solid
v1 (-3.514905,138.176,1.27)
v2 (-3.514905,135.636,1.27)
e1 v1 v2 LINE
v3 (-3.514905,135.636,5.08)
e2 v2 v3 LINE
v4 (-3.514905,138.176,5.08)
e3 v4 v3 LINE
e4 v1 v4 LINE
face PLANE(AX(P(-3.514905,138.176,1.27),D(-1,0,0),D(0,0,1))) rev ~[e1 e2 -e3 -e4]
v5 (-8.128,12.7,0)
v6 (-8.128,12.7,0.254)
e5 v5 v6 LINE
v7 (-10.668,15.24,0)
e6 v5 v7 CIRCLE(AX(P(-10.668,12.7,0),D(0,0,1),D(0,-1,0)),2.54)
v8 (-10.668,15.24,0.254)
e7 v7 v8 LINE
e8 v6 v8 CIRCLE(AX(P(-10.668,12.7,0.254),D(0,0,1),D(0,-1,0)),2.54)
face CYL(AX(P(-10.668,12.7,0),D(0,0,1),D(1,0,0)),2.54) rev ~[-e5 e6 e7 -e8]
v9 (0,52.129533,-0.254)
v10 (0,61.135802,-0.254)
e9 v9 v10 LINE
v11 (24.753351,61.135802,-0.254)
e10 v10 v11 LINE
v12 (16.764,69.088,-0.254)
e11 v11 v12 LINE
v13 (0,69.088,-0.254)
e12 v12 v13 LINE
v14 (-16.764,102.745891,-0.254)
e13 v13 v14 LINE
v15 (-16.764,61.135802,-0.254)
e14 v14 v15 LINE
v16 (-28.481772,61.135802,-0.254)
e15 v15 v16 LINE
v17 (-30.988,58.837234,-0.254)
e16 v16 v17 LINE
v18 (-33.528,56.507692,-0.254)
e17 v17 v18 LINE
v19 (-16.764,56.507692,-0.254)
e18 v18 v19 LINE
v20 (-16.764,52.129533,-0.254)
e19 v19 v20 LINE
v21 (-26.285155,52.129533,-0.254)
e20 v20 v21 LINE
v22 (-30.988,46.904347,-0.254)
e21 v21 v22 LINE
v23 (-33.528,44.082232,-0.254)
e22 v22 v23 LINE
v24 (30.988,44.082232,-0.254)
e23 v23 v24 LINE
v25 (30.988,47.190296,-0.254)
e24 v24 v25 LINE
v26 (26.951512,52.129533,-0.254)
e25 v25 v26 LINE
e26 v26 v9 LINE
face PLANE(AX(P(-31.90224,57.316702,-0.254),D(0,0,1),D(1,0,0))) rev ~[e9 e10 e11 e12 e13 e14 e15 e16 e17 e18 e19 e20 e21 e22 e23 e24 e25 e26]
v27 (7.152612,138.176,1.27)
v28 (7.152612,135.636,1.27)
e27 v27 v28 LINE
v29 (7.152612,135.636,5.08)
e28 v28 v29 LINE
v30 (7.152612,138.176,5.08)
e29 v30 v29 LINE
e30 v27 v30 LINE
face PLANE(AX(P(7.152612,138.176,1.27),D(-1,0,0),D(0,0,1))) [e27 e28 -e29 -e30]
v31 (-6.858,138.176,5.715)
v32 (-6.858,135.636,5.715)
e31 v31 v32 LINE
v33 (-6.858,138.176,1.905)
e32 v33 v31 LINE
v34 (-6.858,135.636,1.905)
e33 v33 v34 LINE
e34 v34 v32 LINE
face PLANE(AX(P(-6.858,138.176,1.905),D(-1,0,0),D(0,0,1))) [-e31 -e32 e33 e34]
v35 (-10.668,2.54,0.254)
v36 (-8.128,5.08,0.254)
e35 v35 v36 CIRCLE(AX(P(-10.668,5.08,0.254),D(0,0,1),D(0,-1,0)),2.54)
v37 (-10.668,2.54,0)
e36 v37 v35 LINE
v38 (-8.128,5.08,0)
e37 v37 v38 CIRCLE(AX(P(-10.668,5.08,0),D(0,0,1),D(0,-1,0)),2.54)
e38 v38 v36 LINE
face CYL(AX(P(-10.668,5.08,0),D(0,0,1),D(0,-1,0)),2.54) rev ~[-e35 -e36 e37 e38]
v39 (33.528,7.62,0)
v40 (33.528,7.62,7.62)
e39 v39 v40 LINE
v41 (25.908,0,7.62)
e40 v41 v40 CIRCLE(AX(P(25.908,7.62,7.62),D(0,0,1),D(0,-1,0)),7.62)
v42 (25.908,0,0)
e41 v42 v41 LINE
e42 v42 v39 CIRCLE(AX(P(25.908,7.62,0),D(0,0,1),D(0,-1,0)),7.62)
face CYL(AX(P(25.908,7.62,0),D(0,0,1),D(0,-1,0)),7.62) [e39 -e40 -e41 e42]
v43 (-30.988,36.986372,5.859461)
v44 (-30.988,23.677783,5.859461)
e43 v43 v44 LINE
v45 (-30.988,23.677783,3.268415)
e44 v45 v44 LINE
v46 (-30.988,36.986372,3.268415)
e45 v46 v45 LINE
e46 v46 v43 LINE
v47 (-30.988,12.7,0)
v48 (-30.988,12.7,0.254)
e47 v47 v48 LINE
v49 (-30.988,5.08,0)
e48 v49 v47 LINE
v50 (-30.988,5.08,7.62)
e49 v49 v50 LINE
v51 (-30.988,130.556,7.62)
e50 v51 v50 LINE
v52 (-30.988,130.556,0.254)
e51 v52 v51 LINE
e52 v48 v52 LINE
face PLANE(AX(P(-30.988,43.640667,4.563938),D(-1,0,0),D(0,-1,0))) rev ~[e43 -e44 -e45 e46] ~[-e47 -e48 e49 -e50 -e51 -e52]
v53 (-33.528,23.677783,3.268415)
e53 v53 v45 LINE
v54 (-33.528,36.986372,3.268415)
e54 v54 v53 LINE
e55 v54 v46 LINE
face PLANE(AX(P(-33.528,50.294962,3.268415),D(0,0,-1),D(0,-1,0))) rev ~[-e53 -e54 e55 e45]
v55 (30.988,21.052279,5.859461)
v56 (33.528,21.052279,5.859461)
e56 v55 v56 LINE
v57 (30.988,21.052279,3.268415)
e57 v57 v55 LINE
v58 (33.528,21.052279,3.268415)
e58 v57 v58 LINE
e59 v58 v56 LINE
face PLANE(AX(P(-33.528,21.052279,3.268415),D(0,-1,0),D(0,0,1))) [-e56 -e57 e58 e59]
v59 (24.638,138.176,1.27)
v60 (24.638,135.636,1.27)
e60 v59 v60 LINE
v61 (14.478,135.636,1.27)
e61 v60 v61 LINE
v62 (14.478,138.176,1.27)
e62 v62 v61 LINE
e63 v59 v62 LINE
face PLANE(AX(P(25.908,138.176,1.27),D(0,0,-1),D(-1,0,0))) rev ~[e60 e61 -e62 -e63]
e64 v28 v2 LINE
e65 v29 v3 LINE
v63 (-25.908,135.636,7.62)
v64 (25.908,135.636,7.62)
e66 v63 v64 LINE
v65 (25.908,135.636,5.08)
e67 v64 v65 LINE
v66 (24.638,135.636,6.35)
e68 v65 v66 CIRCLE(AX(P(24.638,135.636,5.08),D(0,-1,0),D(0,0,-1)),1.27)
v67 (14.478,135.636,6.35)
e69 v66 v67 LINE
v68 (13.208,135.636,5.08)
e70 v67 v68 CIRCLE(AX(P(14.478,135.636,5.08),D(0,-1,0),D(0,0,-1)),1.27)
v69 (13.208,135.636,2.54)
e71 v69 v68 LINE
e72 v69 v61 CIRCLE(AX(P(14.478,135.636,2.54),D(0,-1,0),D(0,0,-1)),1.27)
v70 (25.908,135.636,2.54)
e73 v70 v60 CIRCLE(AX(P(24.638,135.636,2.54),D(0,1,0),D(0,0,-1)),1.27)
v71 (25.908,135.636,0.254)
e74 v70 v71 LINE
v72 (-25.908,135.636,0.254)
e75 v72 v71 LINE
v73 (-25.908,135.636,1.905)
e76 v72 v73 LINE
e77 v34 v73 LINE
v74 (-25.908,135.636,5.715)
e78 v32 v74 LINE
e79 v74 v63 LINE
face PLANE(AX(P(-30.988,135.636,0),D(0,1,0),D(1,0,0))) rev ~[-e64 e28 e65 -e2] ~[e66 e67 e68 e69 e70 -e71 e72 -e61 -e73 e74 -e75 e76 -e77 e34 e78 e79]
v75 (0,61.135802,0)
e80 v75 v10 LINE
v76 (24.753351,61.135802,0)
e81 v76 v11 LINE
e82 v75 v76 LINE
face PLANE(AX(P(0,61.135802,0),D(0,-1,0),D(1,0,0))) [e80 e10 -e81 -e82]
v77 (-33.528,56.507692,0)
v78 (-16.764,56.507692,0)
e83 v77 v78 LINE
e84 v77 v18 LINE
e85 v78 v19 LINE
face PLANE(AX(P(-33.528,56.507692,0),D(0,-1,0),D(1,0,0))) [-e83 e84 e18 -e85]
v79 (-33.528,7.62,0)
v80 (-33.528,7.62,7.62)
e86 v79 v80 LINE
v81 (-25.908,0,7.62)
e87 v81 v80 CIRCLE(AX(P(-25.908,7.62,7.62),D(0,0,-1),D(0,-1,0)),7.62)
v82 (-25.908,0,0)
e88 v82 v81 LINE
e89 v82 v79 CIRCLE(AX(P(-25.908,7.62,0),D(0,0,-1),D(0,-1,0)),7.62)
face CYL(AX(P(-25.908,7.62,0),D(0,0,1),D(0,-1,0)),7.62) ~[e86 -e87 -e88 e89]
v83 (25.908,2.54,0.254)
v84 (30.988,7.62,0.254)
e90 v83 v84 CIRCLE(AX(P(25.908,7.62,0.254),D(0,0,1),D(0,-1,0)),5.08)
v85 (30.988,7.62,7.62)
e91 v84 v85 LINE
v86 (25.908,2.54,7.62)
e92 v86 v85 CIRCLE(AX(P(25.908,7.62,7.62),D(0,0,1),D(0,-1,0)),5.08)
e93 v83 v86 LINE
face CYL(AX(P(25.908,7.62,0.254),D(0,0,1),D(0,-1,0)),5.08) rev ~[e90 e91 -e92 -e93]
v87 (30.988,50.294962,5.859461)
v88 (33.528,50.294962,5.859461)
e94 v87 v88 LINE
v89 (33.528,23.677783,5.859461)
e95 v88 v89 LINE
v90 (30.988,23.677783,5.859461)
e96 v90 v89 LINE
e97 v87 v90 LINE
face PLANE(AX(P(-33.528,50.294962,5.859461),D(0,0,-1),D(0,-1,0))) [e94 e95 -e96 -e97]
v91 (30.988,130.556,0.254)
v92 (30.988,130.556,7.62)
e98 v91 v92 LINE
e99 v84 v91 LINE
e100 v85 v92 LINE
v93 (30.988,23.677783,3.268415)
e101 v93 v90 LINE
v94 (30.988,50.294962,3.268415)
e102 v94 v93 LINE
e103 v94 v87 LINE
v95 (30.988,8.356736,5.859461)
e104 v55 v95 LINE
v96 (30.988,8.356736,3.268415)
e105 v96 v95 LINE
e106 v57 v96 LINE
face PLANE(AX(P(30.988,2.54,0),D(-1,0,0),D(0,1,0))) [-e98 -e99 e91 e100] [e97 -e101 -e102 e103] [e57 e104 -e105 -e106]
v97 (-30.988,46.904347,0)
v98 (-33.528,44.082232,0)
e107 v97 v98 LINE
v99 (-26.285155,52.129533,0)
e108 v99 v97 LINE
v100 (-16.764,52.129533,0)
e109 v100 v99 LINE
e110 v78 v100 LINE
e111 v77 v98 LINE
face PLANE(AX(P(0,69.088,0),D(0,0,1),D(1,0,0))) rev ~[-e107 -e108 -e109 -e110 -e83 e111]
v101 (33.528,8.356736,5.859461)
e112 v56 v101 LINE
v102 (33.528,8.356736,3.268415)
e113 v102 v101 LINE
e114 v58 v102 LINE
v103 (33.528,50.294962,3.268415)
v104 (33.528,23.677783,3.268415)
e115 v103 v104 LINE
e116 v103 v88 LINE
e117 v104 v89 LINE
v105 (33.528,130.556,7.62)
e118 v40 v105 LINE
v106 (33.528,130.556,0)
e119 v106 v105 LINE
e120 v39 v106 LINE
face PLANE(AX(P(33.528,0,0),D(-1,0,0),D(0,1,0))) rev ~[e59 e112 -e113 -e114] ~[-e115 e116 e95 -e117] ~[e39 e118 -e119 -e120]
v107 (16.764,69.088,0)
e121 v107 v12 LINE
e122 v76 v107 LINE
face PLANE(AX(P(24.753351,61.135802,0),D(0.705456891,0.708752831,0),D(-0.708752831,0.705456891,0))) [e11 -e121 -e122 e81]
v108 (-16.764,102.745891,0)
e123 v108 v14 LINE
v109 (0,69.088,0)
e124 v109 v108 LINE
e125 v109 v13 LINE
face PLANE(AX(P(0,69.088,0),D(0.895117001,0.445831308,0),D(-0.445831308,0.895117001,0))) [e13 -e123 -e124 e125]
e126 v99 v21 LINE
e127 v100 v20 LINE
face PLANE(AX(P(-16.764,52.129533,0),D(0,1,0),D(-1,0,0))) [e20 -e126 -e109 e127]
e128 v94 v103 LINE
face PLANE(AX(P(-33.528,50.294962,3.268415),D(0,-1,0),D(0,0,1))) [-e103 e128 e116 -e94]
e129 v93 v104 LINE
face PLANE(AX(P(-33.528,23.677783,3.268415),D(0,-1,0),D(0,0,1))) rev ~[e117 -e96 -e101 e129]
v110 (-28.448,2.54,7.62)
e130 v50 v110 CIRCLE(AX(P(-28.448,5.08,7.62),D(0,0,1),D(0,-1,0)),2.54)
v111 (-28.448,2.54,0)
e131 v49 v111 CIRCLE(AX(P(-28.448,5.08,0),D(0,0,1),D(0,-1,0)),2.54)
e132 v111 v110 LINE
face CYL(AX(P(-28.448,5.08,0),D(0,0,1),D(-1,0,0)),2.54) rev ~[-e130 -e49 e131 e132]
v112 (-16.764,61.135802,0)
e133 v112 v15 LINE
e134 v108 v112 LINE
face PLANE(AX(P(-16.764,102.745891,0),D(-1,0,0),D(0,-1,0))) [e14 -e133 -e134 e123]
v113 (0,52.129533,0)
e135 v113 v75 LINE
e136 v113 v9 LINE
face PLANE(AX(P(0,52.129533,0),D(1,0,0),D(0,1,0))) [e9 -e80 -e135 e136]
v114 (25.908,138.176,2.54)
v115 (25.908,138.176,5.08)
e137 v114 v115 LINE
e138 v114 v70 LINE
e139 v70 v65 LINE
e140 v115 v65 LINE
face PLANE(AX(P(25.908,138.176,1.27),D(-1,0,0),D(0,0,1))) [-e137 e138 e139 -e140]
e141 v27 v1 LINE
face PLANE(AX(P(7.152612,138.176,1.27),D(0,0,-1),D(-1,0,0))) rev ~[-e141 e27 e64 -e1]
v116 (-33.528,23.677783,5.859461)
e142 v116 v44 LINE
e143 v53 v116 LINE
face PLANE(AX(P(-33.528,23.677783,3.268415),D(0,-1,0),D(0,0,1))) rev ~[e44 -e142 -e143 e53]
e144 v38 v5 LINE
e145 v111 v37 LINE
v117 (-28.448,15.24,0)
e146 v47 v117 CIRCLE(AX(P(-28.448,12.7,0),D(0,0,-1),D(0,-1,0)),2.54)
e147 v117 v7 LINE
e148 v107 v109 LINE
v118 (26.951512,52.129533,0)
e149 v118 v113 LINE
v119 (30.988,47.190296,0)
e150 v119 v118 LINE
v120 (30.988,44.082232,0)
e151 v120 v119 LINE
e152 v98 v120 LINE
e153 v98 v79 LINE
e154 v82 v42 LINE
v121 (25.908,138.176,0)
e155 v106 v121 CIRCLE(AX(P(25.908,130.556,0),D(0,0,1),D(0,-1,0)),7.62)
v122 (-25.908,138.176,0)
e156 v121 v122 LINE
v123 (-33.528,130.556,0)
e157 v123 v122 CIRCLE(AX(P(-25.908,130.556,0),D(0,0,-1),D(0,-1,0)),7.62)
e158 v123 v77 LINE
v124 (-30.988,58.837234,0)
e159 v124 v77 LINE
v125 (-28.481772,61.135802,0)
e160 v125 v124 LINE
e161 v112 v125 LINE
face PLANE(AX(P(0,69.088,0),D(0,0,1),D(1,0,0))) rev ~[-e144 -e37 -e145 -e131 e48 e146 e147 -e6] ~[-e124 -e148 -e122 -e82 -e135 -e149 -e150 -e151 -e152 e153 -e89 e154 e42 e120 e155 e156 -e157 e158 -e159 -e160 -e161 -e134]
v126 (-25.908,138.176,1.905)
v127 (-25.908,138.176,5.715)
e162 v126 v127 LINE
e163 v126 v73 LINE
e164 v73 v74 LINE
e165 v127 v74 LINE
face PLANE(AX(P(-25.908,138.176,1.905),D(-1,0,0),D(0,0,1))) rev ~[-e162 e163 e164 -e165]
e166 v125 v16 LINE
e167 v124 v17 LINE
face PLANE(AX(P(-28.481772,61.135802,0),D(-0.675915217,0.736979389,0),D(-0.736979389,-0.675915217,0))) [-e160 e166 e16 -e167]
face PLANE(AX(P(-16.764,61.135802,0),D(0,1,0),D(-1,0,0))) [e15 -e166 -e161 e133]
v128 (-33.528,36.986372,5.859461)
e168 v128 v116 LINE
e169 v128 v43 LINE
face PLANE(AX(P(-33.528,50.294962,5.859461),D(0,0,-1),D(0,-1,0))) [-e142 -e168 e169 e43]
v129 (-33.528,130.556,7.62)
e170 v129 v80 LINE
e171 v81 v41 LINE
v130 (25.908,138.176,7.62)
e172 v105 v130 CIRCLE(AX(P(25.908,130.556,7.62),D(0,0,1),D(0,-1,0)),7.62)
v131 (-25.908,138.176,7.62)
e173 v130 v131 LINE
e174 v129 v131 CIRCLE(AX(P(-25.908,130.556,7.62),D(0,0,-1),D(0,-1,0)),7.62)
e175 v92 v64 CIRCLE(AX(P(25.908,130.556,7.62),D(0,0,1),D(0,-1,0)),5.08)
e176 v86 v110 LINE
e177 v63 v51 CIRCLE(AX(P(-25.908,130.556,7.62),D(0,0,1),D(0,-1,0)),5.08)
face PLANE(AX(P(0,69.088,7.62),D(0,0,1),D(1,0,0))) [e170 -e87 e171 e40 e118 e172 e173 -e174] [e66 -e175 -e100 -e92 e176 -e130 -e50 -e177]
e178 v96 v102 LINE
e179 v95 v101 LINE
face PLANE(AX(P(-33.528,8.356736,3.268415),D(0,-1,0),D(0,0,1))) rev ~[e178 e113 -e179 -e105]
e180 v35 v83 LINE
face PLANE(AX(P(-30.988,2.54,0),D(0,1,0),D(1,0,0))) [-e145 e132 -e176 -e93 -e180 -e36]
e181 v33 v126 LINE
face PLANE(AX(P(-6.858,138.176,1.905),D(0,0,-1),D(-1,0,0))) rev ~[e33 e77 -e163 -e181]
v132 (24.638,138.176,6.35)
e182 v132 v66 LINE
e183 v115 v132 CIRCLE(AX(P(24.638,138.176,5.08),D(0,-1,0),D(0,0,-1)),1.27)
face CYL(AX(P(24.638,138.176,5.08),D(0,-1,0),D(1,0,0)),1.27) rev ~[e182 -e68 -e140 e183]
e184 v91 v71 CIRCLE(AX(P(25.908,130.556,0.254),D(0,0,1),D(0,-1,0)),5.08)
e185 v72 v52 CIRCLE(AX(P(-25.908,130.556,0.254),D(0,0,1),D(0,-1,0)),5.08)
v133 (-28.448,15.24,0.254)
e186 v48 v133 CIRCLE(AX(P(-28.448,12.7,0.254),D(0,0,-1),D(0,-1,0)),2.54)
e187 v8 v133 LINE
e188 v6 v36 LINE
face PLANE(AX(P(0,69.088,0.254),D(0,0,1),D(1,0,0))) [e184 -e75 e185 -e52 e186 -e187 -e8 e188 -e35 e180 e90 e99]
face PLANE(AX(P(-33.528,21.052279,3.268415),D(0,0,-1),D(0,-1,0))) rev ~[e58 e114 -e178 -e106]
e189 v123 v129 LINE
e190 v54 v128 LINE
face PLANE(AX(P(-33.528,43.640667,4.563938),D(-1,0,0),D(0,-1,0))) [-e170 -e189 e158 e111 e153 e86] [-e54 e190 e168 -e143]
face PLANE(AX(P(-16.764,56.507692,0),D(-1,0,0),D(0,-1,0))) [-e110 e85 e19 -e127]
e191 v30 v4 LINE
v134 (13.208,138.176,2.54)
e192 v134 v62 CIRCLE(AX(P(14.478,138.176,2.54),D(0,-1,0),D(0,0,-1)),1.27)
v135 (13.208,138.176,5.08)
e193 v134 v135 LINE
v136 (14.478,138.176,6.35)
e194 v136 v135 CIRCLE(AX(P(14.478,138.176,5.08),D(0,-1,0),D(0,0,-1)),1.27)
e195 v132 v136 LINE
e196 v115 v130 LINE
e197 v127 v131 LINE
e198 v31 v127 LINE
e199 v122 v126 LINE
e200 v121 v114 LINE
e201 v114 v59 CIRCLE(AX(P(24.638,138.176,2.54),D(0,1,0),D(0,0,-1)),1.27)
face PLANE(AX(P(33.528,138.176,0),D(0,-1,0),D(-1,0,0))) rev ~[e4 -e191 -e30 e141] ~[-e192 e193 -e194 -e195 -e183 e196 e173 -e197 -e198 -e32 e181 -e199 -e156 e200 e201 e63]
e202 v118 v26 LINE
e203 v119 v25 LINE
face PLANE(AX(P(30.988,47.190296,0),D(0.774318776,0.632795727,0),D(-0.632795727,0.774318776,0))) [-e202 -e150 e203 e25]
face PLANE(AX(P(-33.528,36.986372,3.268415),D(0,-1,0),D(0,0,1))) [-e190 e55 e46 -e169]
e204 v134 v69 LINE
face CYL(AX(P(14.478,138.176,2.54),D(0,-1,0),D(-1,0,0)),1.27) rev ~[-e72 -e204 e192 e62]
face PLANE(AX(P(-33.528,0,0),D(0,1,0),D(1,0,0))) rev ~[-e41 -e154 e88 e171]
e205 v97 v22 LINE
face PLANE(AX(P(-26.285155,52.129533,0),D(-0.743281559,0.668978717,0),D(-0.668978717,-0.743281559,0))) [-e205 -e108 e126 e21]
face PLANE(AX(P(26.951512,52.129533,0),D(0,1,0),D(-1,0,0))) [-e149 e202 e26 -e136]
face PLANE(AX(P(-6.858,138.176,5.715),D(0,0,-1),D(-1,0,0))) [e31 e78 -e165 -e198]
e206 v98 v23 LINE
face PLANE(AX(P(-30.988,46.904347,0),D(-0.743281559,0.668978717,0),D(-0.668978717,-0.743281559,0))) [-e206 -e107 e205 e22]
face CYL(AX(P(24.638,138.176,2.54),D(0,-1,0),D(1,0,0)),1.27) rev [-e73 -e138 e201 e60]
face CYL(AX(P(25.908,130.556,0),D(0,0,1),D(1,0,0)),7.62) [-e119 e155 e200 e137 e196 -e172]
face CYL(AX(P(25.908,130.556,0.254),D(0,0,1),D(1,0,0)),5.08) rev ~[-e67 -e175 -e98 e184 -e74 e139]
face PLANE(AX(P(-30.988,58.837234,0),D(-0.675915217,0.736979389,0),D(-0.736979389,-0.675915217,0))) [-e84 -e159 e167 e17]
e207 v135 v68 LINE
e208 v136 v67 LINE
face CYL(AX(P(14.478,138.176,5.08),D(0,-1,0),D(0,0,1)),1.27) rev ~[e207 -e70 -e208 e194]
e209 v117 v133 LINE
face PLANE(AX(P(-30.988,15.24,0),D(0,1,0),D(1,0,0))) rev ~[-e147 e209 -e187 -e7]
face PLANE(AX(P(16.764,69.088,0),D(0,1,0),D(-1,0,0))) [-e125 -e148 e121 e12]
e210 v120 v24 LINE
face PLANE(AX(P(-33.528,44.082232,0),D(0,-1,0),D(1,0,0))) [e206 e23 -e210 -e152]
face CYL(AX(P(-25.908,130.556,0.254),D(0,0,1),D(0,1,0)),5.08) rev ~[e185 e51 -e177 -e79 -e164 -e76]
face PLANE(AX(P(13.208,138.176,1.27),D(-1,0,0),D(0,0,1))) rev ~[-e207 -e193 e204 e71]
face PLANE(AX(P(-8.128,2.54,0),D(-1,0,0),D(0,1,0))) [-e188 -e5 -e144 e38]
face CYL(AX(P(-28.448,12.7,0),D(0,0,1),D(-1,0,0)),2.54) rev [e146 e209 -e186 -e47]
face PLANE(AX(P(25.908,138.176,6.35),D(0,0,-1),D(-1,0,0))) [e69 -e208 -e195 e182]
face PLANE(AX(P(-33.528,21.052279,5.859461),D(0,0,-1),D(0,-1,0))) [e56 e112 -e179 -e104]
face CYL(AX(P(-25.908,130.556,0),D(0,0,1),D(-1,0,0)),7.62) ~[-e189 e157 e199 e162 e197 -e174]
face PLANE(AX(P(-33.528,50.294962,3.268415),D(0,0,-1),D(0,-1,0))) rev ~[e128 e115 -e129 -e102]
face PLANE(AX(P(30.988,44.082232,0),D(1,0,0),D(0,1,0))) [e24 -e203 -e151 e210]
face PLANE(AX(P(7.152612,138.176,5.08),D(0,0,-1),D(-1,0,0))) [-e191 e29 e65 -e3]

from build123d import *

# Parameters (mm, degrees)
F0_W      = 61.976
F0_H      = 133.096
F1_DEPTH  = 7.62
F2_DEPTH  = 0.254
F3_R      = 7.62
F4_R      = 5.08
F6_DEPTH  = 0.254
F7_W      = 26.6171786934
F7_H      = 2.5910458062
F7_W_2    = 12.6955425367
F8_DEPTH  = 381
F9_W      = 12.6955425367
F9_H      = 2.5910458062
F10_DEPTH = 2.54
F11_W     = 13.3085893467
F11_H     = 2.5910458062
F12_DEPTH = 2.54
F13_W     = 22.86
F13_H     = 12.7
F14_DEPTH = 25.4
F15_R     = 2.54
F16_W     = 12.7
F16_H     = 5.08
F17_DEPTH = 25.4
F18_R     = 1.27
F19_W     = 19.05
F19_H     = 3.81
F20_DEPTH = 25.4
F21_W     = 10.6675168499
F21_H     = 3.81
F22_DEPTH = 25.4


with BuildPart() as f1:
    # F0 (on Top) → F1 (new body)
    with BuildSketch(Plane.XY):
        Polygon((-33.528, 0), (0, 0), (33.528, 0), (33.528, 138.176), (0, 138.176), (-33.528, 138.176), align=None)
        with Locations((0, 69.088)):
            Rectangle(F0_W, F0_H, mode=Mode.SUBTRACT)
    extrude(amount=F1_DEPTH)

    # F0 (on Top) → F2 (join)
    with BuildSketch(Plane.XY):
        with Locations((0, 69.088)):
            Rectangle(F0_W, F0_H)
    extrude(amount=F2_DEPTH)

    # F3
    f3_edges = [f1.edges().sort_by_distance(p)[0] for p in [
        (-33.528, 0, 3.81),
        (33.528, 0, 3.81),
        (33.528, 138.176, 3.81),
        (-33.528, 138.176, 3.81),
    ]]
    fillet(f3_edges, radius=F3_R)

    # F4
    f4_edges = [f1.edges().sort_by_distance(p)[0] for p in [
        (-30.988, 135.636, 3.937),
        (30.988, 135.636, 3.937),
        (-30.988, 2.54, 3.937),
        (30.988, 2.54, 3.937),
    ]]
    fillet(f4_edges, radius=F4_R)

    # F5 (on face) → F6 (join)
    with BuildSketch(Plane.XY):
        Polygon((-30.988, 58.8372340277), (-33.528, 56.507691741), (-30.988, 56.507691741), align=None)
        Polygon((16.764, 69.088), (0, 69.088), (-16.764, 69.088), (-16.764, 61.135802418), (-28.4817721695, 61.135802418), (-30.988, 58.8372340277), (-30.988, 56.507691741), (-16.764, 56.507691741), (-16.764, 52.1295331419), (-26.285154745, 52.1295331419), (-30.988, 46.9043472506), (-30.988, 44.0822318196), (0, 44.0822318196), (30.988, 44.0822318196), (30.988, 47.1902959351), (26.9515123218, 52.1295331419), (0, 52.1295331419), (0, 61.135802418), (24.7533507645, 61.135802418), align=None)
        Polygon((-16.764, 69.088), (0, 69.088), (-16.764, 102.7458906174), align=None)
        Polygon((-30.988, 46.9043472506), (-33.528, 44.0822318196), (-30.988, 44.0822318196), align=None)
    extrude(amount=-F6_DEPTH)

    # F7 (on face) → F8 (cut)
    with BuildSketch(Plane(origin=(-33.528, 0, 0), x_dir=(0, -1, 0), z_dir=(-1, 0, 0))):
        with Locations((-36.9863724336, 4.5639382442)):
            Rectangle(F7_W, F7_H)
        with Locations((-14.7045073099, 4.5639382442)):
            Rectangle(F7_W_2, F7_H)
    extrude(amount=-F8_DEPTH, mode=Mode.SUBTRACT)

    # F9 (on face) → F10 (join)
    with BuildSketch(Plane(origin=(-33.528, 0, 0), x_dir=(0, -1, 0), z_dir=(-1, 0, 0))):
        with Locations((-14.7045073099, 4.5639382442)):
            Rectangle(F9_W, F9_H)
    extrude(amount=-F10_DEPTH)

    # F11 (on face) → F12 (join)
    with BuildSketch(Plane(origin=(-33.528, 0, 0), x_dir=(0, -1, 0), z_dir=(-1, 0, 0))):
        with Locations((-43.640667107, 4.5639382442)):
            Rectangle(F11_W, F11_H)
    extrude(amount=-F12_DEPTH)

    # F13 (on face) → F14 (cut)
    with BuildSketch(Plane.XY):
        with Locations((-19.558, 8.89)):
            Rectangle(F13_W, F13_H)
    extrude(amount=F14_DEPTH, mode=Mode.SUBTRACT)

    # F15
    f15_edges = [f1.edges().sort_by_distance(p)[0] for p in [
        (-8.128, 15.24, 0.127),
        (-8.128, 2.54, 0.127),
        (-30.988, 2.54, 3.81),
        (-30.988, 15.24, 0.127),
    ]]
    fillet(f15_edges, radius=F15_R)

    # F16 (on face) → F17 (cut)
    with BuildSketch(Plane(origin=(0, 138.176, 0), x_dir=(-1, 0, 0), z_dir=(0, 1, 0))):
        with Locations((-19.558, 3.81)):
            Rectangle(F16_W, F16_H)
    extrude(amount=-F17_DEPTH, mode=Mode.SUBTRACT)

    # F18
    f18_edges = [f1.edges().sort_by_distance(p)[0] for p in [
        (13.208, 136.906, 1.27),
        (25.908, 136.906, 1.27),
        (25.908, 136.906, 6.35),
        (13.208, 136.906, 6.35),
    ]]
    fillet(f18_edges, radius=F18_R)

    # F19 (on face) → F20 (cut)
    with BuildSketch(Plane(origin=(0, 138.176, 0), x_dir=(-1, 0, 0), z_dir=(0, 1, 0))):
        with Locations((16.383, 3.81)):
            Rectangle(F19_W, F19_H)
    extrude(amount=-F20_DEPTH, mode=Mode.SUBTRACT)

    # F21 (on face) → F22 (cut)
    with BuildSketch(Plane(origin=(0, 138.176, 0), x_dir=(-1, 0, 0), z_dir=(0, 1, 0))):
        with Locations((-1.8188538961, 3.175)):
            Rectangle(F21_W, F21_H)
    extrude(amount=-F22_DEPTH, mode=Mode.SUBTRACT)


solid = f1.part
